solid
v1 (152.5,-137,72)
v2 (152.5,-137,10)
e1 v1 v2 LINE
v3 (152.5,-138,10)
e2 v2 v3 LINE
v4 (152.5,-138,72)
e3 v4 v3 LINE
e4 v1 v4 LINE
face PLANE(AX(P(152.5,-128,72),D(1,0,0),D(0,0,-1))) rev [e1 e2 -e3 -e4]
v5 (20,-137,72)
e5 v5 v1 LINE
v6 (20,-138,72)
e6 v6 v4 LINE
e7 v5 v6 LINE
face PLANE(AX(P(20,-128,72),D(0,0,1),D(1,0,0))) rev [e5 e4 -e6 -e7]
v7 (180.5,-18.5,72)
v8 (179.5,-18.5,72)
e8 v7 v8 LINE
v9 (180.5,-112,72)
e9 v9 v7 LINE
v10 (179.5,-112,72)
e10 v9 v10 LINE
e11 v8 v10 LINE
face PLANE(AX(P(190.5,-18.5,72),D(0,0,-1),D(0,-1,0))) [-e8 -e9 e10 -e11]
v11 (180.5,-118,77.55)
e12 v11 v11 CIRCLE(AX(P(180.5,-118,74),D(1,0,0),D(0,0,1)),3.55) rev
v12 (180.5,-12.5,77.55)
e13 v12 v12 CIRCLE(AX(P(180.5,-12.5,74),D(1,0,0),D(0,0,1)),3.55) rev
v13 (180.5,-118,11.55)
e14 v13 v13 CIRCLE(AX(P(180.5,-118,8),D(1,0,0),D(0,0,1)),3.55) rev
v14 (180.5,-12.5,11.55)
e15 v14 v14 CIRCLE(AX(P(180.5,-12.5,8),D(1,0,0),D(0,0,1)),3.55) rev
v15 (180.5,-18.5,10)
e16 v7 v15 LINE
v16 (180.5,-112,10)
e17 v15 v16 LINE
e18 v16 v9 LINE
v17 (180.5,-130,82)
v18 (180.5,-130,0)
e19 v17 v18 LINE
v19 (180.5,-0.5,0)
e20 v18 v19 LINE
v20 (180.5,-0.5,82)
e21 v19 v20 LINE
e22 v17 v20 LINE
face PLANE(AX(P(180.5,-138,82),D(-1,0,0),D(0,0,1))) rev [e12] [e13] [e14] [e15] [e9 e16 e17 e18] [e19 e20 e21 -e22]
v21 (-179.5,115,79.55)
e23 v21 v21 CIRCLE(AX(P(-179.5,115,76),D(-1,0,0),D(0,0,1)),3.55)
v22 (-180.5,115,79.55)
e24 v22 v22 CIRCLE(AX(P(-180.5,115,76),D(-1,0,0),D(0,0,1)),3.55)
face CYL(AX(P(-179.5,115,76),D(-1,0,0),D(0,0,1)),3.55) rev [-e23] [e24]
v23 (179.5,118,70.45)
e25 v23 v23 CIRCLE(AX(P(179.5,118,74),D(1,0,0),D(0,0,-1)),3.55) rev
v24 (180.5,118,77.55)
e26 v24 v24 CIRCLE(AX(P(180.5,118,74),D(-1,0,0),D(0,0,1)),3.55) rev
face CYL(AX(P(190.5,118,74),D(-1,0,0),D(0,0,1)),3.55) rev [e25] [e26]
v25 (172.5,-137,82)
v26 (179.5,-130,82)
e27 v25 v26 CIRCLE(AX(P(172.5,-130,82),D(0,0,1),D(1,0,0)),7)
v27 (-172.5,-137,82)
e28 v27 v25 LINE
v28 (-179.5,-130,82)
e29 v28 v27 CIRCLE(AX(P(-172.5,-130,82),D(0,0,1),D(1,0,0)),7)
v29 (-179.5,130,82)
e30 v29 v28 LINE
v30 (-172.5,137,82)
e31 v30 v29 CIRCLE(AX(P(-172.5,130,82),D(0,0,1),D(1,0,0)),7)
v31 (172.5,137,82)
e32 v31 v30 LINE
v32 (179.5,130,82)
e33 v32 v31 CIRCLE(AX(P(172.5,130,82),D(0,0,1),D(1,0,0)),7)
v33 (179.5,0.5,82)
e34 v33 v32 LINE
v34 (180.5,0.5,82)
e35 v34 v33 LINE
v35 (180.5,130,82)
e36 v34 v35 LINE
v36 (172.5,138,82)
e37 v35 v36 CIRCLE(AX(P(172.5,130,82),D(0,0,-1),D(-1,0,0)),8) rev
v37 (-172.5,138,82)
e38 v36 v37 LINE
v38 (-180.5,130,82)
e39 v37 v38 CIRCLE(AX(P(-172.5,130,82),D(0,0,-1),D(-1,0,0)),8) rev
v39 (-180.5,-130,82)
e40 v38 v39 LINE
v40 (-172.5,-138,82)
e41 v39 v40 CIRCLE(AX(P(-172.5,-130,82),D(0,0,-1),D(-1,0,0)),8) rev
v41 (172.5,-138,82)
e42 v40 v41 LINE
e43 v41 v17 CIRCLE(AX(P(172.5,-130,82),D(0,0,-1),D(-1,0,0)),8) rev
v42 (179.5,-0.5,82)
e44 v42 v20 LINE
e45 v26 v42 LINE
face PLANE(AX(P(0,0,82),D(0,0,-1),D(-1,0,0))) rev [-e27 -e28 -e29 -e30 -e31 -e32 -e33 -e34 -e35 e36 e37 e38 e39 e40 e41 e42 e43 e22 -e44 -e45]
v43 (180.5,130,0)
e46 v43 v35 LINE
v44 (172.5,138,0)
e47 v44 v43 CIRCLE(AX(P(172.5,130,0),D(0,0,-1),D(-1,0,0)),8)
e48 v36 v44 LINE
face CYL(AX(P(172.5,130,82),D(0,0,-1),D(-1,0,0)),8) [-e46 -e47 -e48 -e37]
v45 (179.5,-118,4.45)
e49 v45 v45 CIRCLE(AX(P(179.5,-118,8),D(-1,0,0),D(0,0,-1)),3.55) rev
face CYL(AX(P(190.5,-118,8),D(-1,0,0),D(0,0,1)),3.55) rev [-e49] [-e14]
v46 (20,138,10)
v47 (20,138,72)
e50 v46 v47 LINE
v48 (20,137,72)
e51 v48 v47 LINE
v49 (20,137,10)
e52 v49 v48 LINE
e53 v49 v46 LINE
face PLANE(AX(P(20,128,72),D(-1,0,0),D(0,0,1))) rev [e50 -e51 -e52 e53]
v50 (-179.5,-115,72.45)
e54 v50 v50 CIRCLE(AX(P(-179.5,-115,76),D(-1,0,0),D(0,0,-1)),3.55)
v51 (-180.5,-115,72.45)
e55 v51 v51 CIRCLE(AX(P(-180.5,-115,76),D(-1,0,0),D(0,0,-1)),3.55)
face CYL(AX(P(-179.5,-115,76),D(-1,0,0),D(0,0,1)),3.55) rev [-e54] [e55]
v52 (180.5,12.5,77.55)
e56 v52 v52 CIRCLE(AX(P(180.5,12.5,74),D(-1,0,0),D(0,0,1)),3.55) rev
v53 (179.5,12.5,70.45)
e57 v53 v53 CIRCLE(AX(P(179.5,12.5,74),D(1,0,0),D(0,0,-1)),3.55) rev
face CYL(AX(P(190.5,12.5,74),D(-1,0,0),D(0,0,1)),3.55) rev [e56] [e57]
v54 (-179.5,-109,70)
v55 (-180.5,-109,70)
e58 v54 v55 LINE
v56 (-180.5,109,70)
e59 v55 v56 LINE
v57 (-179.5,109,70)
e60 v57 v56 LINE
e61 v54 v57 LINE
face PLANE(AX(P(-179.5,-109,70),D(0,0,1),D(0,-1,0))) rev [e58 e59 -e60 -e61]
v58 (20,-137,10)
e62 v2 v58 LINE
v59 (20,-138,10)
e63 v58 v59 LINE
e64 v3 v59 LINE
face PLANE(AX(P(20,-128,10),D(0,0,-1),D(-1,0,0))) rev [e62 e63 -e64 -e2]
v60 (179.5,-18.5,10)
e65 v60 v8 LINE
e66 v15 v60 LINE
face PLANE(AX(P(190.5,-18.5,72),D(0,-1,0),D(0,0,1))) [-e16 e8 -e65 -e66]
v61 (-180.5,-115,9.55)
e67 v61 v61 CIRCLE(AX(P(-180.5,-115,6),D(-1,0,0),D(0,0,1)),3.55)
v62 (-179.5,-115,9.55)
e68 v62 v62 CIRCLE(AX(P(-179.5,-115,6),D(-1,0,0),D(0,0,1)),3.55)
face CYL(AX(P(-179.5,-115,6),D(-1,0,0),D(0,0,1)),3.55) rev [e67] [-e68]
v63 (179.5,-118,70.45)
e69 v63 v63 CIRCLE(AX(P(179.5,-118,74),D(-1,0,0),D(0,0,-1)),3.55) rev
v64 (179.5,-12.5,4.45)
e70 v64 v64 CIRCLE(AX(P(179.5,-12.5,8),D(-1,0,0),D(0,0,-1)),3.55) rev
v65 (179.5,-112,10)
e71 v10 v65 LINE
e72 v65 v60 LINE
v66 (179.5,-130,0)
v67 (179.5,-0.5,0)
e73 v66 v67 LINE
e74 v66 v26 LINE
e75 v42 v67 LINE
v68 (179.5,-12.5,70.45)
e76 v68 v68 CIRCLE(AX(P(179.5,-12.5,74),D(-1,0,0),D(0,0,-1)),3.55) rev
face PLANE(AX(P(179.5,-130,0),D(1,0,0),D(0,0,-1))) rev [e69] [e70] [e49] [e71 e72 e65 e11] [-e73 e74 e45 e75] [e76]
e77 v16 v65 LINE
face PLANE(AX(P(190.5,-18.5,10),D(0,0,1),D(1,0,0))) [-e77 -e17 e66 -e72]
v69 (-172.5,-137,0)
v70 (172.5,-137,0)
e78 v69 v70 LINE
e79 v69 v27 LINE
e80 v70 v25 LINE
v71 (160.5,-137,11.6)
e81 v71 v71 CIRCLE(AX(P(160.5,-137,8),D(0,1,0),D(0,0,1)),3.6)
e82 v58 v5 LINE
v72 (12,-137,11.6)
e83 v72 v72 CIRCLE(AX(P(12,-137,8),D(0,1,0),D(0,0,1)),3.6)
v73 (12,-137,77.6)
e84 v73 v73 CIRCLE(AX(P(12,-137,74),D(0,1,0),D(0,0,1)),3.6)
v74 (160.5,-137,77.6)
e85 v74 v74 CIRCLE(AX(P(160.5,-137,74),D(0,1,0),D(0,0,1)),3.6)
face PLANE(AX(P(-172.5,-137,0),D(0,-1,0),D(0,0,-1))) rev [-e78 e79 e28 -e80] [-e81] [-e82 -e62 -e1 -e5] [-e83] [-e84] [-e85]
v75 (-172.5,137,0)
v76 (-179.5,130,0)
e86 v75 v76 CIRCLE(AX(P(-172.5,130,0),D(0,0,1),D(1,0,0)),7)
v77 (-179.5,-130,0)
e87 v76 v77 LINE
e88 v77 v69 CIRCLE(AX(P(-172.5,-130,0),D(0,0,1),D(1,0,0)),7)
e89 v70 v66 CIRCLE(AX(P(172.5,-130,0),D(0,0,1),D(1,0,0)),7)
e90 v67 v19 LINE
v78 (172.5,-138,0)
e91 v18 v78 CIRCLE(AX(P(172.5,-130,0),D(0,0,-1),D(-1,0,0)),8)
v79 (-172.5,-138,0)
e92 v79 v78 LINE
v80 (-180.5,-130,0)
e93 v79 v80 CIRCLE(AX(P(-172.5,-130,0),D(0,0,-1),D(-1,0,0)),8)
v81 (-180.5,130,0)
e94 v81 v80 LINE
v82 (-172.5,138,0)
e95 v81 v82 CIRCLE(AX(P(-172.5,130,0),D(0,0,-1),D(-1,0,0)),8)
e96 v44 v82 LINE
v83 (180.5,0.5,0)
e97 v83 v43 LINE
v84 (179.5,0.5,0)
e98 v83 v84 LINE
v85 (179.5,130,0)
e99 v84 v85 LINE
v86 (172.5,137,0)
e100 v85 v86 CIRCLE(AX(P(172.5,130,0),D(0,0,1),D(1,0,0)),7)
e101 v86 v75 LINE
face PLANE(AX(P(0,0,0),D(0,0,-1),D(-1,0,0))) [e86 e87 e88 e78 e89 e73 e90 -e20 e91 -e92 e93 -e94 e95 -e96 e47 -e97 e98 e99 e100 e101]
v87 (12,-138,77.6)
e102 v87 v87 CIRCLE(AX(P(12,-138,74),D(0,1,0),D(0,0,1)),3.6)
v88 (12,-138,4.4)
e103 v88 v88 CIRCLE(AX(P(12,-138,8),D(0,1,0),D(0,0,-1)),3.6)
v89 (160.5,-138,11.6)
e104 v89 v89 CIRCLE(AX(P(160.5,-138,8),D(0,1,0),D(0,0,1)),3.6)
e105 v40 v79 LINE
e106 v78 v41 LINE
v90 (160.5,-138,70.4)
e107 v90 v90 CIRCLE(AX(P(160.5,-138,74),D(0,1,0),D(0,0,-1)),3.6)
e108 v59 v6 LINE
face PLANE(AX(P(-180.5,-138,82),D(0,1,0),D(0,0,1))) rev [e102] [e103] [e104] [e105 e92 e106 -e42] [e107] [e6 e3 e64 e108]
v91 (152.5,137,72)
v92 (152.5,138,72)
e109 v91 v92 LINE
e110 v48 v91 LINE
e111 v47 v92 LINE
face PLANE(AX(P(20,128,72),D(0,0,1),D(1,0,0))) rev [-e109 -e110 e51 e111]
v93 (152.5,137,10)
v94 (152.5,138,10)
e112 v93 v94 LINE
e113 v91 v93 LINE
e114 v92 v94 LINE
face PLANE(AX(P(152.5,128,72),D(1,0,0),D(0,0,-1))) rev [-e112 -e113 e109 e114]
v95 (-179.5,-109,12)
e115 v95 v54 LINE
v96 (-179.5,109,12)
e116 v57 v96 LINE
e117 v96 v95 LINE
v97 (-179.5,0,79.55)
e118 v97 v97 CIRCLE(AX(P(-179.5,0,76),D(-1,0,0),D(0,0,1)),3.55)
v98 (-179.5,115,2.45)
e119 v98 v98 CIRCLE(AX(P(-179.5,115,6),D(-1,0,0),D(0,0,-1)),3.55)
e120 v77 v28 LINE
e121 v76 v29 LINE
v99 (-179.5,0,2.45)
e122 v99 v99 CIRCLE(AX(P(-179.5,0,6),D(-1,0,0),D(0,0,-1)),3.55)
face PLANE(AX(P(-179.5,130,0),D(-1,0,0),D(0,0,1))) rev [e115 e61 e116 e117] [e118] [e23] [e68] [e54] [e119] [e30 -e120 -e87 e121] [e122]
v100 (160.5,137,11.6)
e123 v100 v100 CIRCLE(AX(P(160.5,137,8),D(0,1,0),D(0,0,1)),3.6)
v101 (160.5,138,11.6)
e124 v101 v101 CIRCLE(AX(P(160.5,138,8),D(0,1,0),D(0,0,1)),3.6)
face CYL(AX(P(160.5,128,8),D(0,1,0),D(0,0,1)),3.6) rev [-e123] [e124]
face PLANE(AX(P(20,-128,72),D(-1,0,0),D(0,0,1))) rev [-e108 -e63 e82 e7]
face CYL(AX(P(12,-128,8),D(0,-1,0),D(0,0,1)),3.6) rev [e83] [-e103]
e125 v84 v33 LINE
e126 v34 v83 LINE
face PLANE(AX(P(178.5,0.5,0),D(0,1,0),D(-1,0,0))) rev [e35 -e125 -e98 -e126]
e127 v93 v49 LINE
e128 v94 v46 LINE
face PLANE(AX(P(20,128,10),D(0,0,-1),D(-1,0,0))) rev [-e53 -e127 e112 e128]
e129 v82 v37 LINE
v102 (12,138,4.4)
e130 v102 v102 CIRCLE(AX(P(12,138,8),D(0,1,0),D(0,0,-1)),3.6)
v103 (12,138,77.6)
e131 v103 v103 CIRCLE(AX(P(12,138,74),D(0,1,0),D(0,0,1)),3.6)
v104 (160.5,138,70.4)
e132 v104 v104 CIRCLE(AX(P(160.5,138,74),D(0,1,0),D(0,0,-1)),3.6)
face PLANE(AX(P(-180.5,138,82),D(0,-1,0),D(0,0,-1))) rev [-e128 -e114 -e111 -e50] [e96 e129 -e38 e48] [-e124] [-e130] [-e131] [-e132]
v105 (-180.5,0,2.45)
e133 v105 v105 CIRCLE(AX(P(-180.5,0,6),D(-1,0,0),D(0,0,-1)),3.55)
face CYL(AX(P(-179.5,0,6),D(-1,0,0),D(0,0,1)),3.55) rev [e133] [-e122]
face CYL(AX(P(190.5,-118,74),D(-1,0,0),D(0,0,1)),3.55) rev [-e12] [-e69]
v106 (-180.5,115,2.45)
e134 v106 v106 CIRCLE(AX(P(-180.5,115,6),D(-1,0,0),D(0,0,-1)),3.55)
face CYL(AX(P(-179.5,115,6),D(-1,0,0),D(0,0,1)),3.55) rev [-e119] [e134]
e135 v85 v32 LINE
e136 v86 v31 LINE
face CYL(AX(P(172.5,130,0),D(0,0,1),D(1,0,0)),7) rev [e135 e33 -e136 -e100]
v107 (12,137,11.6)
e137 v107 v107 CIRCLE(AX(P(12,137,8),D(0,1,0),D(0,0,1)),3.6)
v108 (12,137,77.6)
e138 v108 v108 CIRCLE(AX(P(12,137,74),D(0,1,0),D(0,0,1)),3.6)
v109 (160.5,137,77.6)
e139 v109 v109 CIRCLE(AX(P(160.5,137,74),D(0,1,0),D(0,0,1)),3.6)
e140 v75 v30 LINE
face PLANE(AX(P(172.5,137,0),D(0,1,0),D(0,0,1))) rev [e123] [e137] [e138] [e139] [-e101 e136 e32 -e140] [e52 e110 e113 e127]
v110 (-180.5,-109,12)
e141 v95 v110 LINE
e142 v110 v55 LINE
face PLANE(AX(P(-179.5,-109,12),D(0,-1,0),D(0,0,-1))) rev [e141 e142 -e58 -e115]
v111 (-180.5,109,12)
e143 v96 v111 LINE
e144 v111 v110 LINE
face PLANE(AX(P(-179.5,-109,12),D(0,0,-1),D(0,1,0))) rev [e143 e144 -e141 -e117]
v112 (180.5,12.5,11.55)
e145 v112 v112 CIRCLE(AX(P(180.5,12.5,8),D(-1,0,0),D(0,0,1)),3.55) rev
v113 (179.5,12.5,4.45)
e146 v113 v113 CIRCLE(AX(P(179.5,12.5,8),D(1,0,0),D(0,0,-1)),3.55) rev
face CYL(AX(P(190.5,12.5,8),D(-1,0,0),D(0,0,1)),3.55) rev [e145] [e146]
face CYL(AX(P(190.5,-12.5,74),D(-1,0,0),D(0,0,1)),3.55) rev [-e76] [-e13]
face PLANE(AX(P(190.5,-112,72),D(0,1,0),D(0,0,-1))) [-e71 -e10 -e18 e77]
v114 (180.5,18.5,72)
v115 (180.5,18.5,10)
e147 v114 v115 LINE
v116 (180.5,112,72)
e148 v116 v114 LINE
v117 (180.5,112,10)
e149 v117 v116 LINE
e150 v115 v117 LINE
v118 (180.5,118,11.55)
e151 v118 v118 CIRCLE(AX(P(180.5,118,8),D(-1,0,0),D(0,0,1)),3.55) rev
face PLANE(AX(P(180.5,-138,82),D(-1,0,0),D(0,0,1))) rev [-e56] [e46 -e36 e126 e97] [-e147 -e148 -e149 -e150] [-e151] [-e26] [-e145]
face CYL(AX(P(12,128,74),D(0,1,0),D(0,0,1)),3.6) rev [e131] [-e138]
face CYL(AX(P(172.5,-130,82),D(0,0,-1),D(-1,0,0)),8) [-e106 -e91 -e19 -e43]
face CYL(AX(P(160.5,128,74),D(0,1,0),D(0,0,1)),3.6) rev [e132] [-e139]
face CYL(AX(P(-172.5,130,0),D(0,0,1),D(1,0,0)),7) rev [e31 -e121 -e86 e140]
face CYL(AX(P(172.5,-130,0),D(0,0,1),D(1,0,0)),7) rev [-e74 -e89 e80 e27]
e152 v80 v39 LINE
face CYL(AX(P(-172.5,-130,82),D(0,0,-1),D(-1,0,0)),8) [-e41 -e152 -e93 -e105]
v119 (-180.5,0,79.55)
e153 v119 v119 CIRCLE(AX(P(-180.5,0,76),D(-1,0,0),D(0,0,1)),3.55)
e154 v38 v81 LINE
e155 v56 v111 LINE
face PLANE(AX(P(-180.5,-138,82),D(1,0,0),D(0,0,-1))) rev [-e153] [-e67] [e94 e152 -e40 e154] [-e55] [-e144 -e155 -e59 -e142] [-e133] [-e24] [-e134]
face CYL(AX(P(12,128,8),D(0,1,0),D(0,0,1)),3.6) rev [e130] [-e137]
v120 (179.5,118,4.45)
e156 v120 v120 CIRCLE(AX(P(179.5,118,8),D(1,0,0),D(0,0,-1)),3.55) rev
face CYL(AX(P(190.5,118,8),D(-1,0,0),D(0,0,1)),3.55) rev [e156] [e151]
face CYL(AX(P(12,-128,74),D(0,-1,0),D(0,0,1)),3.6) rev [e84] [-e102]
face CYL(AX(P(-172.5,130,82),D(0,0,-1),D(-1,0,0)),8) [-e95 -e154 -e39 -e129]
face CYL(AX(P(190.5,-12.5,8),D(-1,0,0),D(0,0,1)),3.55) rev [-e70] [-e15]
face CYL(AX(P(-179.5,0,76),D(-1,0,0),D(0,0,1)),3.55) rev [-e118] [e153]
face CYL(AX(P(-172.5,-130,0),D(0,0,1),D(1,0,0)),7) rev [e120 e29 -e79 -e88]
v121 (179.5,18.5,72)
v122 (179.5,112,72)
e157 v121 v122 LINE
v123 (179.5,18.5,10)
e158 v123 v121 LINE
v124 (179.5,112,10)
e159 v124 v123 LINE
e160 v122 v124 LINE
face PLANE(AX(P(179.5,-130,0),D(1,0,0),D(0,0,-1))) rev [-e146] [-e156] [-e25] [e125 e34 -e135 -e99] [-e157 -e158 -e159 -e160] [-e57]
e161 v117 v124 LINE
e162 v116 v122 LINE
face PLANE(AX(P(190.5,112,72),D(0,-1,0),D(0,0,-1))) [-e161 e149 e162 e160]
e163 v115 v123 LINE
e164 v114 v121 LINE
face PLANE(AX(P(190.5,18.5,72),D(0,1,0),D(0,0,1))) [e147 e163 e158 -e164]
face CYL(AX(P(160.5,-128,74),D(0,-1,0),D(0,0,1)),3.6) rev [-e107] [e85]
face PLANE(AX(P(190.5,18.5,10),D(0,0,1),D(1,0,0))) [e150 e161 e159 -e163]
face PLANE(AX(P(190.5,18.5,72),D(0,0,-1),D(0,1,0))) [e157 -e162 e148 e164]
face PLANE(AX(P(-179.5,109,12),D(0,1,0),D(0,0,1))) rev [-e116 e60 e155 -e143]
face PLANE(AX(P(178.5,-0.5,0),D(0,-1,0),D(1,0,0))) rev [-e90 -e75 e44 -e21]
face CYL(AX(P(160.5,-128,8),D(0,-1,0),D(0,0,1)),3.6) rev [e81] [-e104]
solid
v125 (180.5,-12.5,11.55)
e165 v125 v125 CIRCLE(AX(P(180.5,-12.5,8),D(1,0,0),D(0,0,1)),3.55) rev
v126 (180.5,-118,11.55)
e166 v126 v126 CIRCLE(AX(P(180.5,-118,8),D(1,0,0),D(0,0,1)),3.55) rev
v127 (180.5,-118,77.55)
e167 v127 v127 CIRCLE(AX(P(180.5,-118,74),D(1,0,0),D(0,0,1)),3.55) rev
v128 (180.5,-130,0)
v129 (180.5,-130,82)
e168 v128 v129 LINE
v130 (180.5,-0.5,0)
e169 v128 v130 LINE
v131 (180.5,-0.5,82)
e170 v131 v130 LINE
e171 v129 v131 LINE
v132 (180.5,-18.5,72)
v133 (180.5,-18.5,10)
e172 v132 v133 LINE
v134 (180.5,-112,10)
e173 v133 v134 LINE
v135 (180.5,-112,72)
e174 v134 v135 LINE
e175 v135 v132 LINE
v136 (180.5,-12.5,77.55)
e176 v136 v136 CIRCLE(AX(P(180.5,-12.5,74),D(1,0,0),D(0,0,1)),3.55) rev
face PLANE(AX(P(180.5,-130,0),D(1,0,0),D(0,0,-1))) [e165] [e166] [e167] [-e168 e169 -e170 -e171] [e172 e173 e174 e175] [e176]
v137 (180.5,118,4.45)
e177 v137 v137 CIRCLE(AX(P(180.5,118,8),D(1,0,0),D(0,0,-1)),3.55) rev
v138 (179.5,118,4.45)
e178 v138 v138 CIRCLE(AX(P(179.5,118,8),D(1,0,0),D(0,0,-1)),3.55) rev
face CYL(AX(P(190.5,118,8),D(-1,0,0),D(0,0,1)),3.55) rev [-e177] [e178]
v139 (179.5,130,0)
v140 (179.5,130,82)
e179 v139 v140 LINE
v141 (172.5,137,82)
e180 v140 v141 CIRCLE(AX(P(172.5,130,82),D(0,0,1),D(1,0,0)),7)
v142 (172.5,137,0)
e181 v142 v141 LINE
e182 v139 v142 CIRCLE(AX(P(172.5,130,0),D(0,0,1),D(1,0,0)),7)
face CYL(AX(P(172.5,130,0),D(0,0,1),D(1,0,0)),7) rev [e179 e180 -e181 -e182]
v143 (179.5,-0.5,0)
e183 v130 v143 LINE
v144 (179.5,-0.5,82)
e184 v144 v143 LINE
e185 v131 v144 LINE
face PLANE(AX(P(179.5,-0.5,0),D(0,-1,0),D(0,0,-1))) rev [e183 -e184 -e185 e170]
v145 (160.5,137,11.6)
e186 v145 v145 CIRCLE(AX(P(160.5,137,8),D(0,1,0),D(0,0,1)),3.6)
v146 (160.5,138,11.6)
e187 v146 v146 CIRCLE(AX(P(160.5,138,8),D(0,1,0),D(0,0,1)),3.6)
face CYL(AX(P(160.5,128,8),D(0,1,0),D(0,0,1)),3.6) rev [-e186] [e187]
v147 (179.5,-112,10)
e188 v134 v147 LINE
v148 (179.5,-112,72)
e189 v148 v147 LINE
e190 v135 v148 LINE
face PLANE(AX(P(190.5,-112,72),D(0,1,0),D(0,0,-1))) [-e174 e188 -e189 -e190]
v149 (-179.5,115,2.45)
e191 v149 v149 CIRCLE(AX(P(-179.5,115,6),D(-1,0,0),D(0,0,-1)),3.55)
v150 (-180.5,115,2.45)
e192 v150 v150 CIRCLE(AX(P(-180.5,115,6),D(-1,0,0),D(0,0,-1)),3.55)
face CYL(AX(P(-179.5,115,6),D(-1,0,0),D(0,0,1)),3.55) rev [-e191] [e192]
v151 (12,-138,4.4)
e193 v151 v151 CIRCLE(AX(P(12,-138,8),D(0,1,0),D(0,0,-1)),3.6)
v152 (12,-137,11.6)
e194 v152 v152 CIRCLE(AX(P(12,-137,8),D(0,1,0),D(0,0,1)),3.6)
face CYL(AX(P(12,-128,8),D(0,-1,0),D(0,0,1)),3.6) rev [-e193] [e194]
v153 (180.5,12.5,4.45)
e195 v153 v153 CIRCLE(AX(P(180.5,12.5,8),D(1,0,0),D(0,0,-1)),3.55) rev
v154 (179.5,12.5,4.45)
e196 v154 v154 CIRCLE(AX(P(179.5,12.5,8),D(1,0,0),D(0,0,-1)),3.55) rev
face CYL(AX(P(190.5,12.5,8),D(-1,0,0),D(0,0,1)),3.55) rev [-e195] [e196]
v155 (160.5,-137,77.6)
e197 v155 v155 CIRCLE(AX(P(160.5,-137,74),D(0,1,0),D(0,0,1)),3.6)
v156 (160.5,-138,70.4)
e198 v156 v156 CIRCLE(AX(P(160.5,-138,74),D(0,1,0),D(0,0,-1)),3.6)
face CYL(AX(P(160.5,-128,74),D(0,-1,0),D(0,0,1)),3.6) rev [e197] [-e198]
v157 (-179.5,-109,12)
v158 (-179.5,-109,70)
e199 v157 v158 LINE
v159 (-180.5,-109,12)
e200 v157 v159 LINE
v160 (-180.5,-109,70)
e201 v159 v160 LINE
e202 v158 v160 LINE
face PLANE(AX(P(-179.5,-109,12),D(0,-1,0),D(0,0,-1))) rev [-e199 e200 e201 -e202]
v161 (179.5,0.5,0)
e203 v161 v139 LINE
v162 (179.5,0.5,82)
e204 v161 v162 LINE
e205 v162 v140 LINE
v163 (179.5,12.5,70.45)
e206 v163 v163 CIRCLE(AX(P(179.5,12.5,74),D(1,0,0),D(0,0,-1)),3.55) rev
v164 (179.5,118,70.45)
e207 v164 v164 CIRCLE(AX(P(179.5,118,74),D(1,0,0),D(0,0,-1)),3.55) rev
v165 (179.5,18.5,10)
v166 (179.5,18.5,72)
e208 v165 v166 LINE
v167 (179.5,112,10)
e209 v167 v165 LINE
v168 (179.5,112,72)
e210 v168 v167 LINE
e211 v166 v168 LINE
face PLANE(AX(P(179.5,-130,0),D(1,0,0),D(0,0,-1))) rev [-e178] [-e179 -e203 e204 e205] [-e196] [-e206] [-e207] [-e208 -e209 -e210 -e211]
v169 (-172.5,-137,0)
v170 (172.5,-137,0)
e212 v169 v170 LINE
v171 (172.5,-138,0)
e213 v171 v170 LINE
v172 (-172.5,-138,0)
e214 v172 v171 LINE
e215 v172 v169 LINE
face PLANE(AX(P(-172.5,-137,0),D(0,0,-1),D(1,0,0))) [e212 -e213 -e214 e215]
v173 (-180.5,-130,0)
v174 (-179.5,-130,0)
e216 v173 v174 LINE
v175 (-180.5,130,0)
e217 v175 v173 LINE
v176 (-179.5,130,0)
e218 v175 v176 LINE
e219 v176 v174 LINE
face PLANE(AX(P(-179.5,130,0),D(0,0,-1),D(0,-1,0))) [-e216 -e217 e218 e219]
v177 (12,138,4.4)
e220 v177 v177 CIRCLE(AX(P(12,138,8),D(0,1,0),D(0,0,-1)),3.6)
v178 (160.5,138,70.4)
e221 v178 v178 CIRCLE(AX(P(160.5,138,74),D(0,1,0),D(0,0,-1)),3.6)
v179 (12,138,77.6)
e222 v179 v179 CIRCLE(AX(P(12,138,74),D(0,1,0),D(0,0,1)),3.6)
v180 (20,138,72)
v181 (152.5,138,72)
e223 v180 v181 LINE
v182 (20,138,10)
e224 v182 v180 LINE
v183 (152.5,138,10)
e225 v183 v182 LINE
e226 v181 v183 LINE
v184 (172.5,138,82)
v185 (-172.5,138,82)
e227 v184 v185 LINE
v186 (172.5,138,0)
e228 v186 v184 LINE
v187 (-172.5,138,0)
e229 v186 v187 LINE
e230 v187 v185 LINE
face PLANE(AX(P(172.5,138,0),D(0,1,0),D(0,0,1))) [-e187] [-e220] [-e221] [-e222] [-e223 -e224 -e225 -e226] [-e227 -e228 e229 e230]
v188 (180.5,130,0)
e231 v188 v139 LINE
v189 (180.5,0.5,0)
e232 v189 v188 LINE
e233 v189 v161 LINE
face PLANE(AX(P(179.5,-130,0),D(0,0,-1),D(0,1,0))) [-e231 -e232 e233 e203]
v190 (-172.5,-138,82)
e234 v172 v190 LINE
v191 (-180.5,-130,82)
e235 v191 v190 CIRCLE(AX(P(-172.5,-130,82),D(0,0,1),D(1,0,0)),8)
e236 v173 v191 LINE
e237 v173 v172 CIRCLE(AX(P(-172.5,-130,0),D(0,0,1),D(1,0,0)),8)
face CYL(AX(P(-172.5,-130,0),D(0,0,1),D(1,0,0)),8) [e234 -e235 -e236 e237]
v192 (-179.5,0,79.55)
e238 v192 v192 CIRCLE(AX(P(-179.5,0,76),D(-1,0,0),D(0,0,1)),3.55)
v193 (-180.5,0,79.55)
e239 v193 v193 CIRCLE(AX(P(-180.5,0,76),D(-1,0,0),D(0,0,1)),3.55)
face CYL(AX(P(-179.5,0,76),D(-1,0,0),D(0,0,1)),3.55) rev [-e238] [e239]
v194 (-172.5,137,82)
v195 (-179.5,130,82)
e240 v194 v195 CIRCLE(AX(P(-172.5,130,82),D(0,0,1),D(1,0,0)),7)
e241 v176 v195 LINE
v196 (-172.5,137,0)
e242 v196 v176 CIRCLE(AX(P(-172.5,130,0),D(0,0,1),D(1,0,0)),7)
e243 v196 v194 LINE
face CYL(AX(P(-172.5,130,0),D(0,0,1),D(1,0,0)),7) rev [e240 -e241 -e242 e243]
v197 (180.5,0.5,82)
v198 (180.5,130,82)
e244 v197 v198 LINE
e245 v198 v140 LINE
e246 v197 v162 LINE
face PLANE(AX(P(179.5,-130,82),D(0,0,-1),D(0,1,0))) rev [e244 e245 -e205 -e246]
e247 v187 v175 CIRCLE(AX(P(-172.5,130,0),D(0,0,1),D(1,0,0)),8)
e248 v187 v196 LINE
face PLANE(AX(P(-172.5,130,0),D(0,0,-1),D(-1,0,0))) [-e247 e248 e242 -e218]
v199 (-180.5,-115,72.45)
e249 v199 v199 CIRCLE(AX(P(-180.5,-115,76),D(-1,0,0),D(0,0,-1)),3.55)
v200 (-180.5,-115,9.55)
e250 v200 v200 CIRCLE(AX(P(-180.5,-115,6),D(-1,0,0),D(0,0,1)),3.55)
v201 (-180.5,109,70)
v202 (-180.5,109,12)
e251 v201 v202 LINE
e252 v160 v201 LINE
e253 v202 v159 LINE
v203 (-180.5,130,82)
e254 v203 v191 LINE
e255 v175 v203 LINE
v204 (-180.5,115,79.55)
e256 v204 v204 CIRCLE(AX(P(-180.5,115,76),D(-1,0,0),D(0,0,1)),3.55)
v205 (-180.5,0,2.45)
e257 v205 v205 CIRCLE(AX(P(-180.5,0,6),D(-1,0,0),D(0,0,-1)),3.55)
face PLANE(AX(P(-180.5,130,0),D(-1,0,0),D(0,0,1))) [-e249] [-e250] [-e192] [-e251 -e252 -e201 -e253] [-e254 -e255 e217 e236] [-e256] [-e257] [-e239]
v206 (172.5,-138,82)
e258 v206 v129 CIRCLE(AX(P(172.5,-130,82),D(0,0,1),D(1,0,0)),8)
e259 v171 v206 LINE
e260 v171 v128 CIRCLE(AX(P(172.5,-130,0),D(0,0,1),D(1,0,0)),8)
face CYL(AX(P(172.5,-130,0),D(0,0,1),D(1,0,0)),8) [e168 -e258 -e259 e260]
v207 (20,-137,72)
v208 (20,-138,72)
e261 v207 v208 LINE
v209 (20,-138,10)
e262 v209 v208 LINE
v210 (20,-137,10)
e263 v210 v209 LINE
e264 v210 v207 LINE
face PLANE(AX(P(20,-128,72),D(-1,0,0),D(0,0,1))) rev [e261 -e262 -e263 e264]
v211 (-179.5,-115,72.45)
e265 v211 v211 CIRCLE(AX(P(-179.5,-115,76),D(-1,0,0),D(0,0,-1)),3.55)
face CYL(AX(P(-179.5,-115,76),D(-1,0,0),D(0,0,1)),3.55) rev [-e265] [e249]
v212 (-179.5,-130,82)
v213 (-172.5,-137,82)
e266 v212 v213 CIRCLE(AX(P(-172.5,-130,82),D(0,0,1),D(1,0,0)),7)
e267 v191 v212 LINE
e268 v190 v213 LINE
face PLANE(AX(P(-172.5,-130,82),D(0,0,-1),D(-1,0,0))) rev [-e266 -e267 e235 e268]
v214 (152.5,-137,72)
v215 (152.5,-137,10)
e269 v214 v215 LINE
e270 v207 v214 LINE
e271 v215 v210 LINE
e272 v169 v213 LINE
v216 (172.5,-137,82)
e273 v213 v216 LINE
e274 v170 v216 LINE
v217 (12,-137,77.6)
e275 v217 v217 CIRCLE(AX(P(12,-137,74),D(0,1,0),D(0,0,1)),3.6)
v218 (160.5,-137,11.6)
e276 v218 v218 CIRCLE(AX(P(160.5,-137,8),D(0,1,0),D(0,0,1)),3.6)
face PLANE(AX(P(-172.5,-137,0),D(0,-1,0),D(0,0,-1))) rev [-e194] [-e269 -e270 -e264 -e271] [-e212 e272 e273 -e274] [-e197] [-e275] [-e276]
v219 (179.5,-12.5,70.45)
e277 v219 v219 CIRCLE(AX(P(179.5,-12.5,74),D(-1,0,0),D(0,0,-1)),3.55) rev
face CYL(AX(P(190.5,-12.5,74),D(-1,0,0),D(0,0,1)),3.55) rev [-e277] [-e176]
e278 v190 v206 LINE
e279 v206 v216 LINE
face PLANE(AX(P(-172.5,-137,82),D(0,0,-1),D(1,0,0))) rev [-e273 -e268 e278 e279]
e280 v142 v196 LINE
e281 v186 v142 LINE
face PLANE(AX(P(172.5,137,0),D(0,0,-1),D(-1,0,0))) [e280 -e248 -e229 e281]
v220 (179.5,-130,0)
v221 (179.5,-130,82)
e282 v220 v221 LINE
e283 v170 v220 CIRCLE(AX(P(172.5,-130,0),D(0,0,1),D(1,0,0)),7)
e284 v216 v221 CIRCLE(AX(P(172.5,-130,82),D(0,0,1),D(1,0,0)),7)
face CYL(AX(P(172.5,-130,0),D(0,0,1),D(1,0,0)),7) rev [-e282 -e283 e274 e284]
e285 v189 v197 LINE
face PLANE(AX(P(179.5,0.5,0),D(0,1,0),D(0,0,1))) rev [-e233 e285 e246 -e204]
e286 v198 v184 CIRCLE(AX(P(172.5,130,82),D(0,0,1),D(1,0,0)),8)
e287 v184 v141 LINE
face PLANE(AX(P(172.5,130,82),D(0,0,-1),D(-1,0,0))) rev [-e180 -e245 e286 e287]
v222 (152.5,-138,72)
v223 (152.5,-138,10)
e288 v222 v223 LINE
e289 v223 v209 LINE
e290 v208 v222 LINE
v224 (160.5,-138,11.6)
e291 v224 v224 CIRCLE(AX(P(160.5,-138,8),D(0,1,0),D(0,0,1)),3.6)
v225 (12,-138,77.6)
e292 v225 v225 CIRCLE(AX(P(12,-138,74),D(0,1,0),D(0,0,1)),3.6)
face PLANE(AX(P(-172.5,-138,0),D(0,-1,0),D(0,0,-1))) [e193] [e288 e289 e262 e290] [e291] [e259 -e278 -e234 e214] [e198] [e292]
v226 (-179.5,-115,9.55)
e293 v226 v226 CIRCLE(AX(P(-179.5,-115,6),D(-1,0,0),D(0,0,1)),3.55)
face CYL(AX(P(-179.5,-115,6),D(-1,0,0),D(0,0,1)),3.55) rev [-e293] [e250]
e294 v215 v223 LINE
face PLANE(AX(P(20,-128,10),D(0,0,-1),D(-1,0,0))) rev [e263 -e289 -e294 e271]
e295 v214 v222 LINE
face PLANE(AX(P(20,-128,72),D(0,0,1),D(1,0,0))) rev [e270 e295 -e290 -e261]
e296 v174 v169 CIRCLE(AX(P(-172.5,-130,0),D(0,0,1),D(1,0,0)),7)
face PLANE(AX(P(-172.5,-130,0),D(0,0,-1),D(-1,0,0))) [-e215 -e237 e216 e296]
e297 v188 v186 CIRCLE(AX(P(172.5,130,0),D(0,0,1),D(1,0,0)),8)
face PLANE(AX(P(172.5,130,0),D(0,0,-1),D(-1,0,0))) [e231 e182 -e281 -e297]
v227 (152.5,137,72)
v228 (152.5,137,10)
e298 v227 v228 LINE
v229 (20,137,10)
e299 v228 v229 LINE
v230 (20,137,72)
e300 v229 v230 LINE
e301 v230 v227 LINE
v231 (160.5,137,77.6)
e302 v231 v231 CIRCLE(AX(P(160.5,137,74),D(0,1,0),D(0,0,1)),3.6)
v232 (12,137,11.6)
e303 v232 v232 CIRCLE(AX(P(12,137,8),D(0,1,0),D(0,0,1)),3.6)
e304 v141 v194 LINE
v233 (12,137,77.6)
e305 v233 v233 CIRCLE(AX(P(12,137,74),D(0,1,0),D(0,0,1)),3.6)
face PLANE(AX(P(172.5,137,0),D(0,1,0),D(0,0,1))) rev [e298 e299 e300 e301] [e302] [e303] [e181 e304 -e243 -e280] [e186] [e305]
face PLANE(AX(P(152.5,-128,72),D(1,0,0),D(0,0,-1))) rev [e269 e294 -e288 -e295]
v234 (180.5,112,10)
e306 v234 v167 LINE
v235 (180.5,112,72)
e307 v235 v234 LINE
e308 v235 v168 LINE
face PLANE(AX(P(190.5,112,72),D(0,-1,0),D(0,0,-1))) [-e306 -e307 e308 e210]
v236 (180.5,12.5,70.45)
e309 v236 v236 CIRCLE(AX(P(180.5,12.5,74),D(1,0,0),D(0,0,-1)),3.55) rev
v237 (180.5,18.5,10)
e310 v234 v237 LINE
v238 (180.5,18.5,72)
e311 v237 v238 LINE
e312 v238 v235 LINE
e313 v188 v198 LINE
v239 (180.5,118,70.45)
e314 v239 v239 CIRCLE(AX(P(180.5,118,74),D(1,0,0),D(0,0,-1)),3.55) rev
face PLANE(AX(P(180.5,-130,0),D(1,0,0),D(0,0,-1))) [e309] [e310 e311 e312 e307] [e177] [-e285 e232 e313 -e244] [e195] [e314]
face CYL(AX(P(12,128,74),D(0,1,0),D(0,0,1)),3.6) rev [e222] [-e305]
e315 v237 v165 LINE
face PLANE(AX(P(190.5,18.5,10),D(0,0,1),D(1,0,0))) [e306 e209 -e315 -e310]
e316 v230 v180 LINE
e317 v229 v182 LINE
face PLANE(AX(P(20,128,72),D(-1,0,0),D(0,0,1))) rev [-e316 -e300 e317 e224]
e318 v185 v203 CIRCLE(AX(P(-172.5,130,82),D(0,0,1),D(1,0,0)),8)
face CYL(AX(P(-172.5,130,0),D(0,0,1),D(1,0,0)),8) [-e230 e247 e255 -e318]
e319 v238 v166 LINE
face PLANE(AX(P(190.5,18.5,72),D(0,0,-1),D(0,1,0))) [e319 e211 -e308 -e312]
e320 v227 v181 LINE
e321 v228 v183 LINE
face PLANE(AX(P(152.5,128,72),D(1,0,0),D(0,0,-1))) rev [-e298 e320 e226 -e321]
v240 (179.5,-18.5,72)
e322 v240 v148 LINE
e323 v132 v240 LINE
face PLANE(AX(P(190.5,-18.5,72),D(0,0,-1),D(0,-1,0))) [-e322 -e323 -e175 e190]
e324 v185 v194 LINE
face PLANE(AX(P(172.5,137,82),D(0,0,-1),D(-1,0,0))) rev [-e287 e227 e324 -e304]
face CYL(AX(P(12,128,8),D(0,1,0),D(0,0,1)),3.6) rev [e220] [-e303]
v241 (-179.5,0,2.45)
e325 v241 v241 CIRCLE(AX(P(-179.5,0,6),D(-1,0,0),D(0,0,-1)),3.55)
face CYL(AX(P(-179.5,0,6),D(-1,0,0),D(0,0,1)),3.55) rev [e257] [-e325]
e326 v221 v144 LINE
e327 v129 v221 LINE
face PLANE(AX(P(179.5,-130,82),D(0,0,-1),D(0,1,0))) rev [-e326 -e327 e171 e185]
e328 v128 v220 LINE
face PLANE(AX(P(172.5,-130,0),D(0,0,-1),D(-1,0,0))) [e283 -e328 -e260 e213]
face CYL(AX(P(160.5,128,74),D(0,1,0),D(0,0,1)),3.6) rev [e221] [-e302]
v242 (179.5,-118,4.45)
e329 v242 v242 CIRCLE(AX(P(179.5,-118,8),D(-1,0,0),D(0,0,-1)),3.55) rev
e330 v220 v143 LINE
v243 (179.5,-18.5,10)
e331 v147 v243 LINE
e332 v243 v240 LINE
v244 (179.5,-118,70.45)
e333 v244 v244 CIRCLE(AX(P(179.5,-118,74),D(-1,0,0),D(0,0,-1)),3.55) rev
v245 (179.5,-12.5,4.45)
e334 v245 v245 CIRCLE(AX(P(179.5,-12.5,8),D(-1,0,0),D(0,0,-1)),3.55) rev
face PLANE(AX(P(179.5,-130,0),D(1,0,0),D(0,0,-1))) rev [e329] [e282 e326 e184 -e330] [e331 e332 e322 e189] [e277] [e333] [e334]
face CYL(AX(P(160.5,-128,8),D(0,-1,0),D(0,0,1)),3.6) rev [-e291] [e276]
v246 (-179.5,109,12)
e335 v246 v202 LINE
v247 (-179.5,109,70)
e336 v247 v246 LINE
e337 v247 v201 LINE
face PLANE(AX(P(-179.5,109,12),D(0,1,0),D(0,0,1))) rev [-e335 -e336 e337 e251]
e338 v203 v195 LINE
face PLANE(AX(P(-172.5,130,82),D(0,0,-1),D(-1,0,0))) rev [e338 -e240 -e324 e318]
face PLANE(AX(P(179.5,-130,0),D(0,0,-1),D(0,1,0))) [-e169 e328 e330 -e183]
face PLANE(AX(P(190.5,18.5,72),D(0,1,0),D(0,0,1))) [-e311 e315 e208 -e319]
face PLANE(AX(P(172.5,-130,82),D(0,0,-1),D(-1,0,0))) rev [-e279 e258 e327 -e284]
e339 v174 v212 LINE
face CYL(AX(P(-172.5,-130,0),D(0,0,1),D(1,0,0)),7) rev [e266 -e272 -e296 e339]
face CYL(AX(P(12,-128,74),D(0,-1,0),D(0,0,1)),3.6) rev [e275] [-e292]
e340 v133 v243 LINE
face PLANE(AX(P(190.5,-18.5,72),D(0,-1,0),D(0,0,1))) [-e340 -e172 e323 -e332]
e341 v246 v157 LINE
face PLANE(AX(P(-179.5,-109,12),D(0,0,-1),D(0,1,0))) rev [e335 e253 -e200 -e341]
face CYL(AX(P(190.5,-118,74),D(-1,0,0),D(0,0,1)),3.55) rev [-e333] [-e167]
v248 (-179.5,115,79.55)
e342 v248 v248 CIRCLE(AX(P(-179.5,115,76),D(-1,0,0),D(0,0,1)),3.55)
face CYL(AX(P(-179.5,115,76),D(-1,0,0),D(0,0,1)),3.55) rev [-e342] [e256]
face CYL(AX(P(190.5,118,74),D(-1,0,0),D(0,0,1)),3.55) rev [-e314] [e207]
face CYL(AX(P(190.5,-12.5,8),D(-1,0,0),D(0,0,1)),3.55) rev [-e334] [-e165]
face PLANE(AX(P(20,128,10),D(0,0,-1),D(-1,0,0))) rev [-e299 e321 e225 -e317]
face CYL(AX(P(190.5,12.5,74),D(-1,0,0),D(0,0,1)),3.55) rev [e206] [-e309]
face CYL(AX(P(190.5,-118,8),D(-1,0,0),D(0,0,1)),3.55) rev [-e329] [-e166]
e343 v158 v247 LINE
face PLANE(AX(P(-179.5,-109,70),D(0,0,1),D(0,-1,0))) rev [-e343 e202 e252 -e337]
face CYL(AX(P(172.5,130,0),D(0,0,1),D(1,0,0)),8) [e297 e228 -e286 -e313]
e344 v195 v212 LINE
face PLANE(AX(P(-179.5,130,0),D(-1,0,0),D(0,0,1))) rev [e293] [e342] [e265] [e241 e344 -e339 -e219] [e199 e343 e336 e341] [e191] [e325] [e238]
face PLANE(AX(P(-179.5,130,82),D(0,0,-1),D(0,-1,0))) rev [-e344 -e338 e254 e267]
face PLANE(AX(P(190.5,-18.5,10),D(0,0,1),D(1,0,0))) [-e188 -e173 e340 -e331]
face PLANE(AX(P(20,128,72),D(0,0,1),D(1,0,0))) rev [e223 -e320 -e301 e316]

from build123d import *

# Parameters (mm, degrees)
PROFILE_W            = 361
PROFILE_H            = 276
BOSS_EXTRUDE1_DEPTH  = 82
FILLET2_R            = 8
CUT_EXTRUDE3_DEPTH   = 242.55382423
SKETCH46_W           = 3
SKETCH46_H           = 1
CUT_EXTRUDE4_DEPTH   = 242.55382423
CONVERT_SOLID8_DEPTH = 82
SKETCH51_R           = 3.55
SKETCH51_W           = 58
SKETCH51_H           = 218
FRONT_PANEL_DEPTH    = 1
SKETCH52_R           = 3.55
SKETCH52_W           = 62
SKETCH52_H           = 93.5
BACK_PLATE_DEPTH     = 10
SKETCH53_R           = 3.6
SKETCH53_W           = 132.5
SKETCH53_H           = 62
SIDE_PANEL_DEPTH     = 10


# Read off the part's stored shape, not the designer's step: Convert-Solid8
with BuildPart() as part:
    # profile → Boss-Extrude1 (new body)
    with BuildSketch(Plane.XY):
        Rectangle(PROFILE_W, PROFILE_H)
    extrude(amount=BOSS_EXTRUDE1_DEPTH)

    # Fillet2
    fillet2_edges = [part.edges().sort_by_distance(p)[0] for p in [
        (180.5, -138, 41),
        (-180.5, -138, 41),
        (-180.5, 138, 41),
        (180.5, 138, 41),
    ]]
    fillet(fillet2_edges, radius=FILLET2_R)

    # Sketch44 → Cut-Extrude3 (cut, through all)
    with BuildSketch(Plane.XY.offset(82)):
        with BuildLine():
            Line((172.5, 137), (-172.5, 137))
            ThreePointArc((-172.5, 137), (-177.449747468, 134.949747468), (-179.5, 130))
            Line((-179.5, 130), (-179.5, -130))
            ThreePointArc((-179.5, -130), (-177.449747468, -134.949747468), (-172.5, -137))
            Line((-172.5, -137), (172.5, -137))
            ThreePointArc((172.5, -137), (177.449747468, -134.949747468), (179.5, -130))
            Line((179.5, -130), (179.5, 130))
            ThreePointArc((179.5, 130), (177.449747468, 134.949747468), (172.5, 137))
        make_face()
    extrude(amount=-CUT_EXTRUDE3_DEPTH, mode=Mode.SUBTRACT)

    # Sketch46 → Cut-Extrude4 (cut, through all)
    with BuildSketch(Plane.XY.offset(82)):
        with Locations((180, 0)):
            Rectangle(SKETCH46_W, SKETCH46_H)
    extrude(amount=-CUT_EXTRUDE4_DEPTH, mode=Mode.SUBTRACT)


with BuildPart() as body_2:
    # Convert-Solid8 outline → Convert-Solid8 (new body)
    with BuildSketch(Plane.XY):
        with BuildLine():
            Line((180.5, -130), (180.5, -0.5))
            Line((180.5, -0.5), (179.5, -0.5))
            Line((179.5, -0.5), (179.5, -130))
            ThreePointArc((179.5, -130), (177.449747468, -134.949747468), (172.5, -137))
            Line((172.5, -137), (-172.5, -137))
            ThreePointArc((-172.5, -137), (-177.449747468, -134.949747468), (-179.5, -130))
            Line((-179.5, -130), (-179.5, 130))
            ThreePointArc((-179.5, 130), (-177.449747468, 134.949747468), (-172.5, 137))
            Line((-172.5, 137), (172.5, 137))
            ThreePointArc((172.5, 137), (177.449747468, 134.949747468), (179.5, 130))
            Line((179.5, 130), (179.5, 0.5))
            Line((179.5, 0.5), (180.5, 0.5))
            Line((180.5, 0.5), (180.5, 130))
            ThreePointArc((180.5, 130), (178.156854249, 135.656854249), (172.5, 138))
            Line((172.5, 138), (-172.5, 138))
            ThreePointArc((-172.5, 138), (-178.156854249, 135.656854249), (-180.5, 130))
            Line((-180.5, 130), (-180.5, -130))
            ThreePointArc((-180.5, -130), (-178.156854249, -135.656854249), (-172.5, -138))
            Line((-172.5, -138), (172.5, -138))
            ThreePointArc((172.5, -138), (178.156854249, -135.656854249), (180.5, -130))
        make_face()
    extrude(amount=CONVERT_SOLID8_DEPTH)


with BuildPart() as front_panel_tool:
    # Sketch51 → Front-Panel (new body)
    with BuildSketch(Plane.ZY.offset(180.5)):
        with Locations((76, 115)):
            Circle(SKETCH51_R)
        with Locations(Location((6, 115, 0), (0, 0, 180))):
            Circle(SKETCH51_R)
        with Locations(Location((76, -115, 0), (0, 0, 180))):
            Circle(SKETCH51_R)
        with Locations((6, -115)):
            Circle(SKETCH51_R)
        with Locations((76, 0)):
            Circle(SKETCH51_R)
        with Locations(Location((6, 0, 0), (0, 0, 180))):
            Circle(SKETCH51_R)
        with Locations((41, 0)):
            Rectangle(SKETCH51_W, SKETCH51_H)
    extrude(amount=-FRONT_PANEL_DEPTH)


with BuildPart() as part_1:
    add(part.part)

    # Front-Panel: cut by front_panel_tool
    add(front_panel_tool.part, mode=Mode.SUBTRACT)


with BuildPart() as body_2_1:
    add(body_2.part)

    # Front-Panel: cut by front_panel_tool
    add(front_panel_tool.part, mode=Mode.SUBTRACT)


with BuildPart() as back_plate_tool:
    # Sketch52 → Back-Plate (new, symmetric)
    with BuildSketch(Plane(origin=(180.5, 0, 0), x_dir=(0, 0, -1), z_dir=(1, 0, 0))):
        with Locations((-74, 118)):
            Circle(SKETCH52_R)
        with Locations((-8, 118)):
            Circle(SKETCH52_R)
        with Locations((-8, 12.5)):
            Circle(SKETCH52_R)
        with Locations((-74, 12.5)):
            Circle(SKETCH52_R)
        with Locations((-41, 65.25)):
            Rectangle(SKETCH52_W, SKETCH52_H)
    back_plate = extrude(amount=BACK_PLATE_DEPTH, both=True)


with BuildPart() as part_2:
    add(part_1.part)

    # Back-Plate: cut by back_plate_tool
    add(back_plate_tool.part, mode=Mode.SUBTRACT)


with BuildPart() as body_2_2:
    add(body_2_1.part)

    # Back-Plate: cut by back_plate_tool
    add(back_plate_tool.part, mode=Mode.SUBTRACT)


with BuildPart() as mirror1_tool:
    # Mirror1: Back-Plate across plane
    add(back_plate.mirror(Plane.ZX))


with BuildPart() as part_3:
    add(part_2.part)

    # Mirror1: cut by mirror1_tool
    add(mirror1_tool.part, mode=Mode.SUBTRACT)


with BuildPart() as body_2_3:
    add(body_2_2.part)

    # Mirror1: cut by mirror1_tool
    add(mirror1_tool.part, mode=Mode.SUBTRACT)


with BuildPart() as side_panel_tool:
    # Sketch53 → Side-Panel (new body)
    with BuildSketch(Plane(origin=(0, 138, 0), x_dir=(1, 0, 0), z_dir=(0, 1, 0))):
        with Locations(Location((160.5, -8, 0), (0, 0, 270))):
            Circle(SKETCH53_R)
        with Locations(Location((12, -8, 0), (0, 0, 270))):
            Circle(SKETCH53_R)
        with Locations(Location((160.5, -74, 0), (0, 0, 270))):
            Circle(SKETCH53_R)
        with Locations(Location((12, -74, 0), (0, 0, 270))):
            Circle(SKETCH53_R)
        with Locations((86.25, -41)):
            Rectangle(SKETCH53_W, SKETCH53_H)
    side_panel = extrude(amount=-SIDE_PANEL_DEPTH)


with BuildPart() as part_4:
    add(part_3.part)

    # Side-Panel: cut by side_panel_tool
    add(side_panel_tool.part, mode=Mode.SUBTRACT)


with BuildPart() as body_2_4:
    add(body_2_3.part)

    # Side-Panel: cut by side_panel_tool
    add(side_panel_tool.part, mode=Mode.SUBTRACT)


with BuildPart() as mirror2_tool:
    # Mirror2: Side-Panel across plane
    add(side_panel.mirror(Plane.ZX))


with BuildPart() as part_5:
    add(part_4.part)

    # Mirror2: cut by mirror2_tool
    add(mirror2_tool.part, mode=Mode.SUBTRACT)


with BuildPart() as body_2_5:
    add(body_2_4.part)

    # Mirror2: cut by mirror2_tool
    add(mirror2_tool.part, mode=Mode.SUBTRACT)


solid = Compound([part_5.part, body_2_5.part])
